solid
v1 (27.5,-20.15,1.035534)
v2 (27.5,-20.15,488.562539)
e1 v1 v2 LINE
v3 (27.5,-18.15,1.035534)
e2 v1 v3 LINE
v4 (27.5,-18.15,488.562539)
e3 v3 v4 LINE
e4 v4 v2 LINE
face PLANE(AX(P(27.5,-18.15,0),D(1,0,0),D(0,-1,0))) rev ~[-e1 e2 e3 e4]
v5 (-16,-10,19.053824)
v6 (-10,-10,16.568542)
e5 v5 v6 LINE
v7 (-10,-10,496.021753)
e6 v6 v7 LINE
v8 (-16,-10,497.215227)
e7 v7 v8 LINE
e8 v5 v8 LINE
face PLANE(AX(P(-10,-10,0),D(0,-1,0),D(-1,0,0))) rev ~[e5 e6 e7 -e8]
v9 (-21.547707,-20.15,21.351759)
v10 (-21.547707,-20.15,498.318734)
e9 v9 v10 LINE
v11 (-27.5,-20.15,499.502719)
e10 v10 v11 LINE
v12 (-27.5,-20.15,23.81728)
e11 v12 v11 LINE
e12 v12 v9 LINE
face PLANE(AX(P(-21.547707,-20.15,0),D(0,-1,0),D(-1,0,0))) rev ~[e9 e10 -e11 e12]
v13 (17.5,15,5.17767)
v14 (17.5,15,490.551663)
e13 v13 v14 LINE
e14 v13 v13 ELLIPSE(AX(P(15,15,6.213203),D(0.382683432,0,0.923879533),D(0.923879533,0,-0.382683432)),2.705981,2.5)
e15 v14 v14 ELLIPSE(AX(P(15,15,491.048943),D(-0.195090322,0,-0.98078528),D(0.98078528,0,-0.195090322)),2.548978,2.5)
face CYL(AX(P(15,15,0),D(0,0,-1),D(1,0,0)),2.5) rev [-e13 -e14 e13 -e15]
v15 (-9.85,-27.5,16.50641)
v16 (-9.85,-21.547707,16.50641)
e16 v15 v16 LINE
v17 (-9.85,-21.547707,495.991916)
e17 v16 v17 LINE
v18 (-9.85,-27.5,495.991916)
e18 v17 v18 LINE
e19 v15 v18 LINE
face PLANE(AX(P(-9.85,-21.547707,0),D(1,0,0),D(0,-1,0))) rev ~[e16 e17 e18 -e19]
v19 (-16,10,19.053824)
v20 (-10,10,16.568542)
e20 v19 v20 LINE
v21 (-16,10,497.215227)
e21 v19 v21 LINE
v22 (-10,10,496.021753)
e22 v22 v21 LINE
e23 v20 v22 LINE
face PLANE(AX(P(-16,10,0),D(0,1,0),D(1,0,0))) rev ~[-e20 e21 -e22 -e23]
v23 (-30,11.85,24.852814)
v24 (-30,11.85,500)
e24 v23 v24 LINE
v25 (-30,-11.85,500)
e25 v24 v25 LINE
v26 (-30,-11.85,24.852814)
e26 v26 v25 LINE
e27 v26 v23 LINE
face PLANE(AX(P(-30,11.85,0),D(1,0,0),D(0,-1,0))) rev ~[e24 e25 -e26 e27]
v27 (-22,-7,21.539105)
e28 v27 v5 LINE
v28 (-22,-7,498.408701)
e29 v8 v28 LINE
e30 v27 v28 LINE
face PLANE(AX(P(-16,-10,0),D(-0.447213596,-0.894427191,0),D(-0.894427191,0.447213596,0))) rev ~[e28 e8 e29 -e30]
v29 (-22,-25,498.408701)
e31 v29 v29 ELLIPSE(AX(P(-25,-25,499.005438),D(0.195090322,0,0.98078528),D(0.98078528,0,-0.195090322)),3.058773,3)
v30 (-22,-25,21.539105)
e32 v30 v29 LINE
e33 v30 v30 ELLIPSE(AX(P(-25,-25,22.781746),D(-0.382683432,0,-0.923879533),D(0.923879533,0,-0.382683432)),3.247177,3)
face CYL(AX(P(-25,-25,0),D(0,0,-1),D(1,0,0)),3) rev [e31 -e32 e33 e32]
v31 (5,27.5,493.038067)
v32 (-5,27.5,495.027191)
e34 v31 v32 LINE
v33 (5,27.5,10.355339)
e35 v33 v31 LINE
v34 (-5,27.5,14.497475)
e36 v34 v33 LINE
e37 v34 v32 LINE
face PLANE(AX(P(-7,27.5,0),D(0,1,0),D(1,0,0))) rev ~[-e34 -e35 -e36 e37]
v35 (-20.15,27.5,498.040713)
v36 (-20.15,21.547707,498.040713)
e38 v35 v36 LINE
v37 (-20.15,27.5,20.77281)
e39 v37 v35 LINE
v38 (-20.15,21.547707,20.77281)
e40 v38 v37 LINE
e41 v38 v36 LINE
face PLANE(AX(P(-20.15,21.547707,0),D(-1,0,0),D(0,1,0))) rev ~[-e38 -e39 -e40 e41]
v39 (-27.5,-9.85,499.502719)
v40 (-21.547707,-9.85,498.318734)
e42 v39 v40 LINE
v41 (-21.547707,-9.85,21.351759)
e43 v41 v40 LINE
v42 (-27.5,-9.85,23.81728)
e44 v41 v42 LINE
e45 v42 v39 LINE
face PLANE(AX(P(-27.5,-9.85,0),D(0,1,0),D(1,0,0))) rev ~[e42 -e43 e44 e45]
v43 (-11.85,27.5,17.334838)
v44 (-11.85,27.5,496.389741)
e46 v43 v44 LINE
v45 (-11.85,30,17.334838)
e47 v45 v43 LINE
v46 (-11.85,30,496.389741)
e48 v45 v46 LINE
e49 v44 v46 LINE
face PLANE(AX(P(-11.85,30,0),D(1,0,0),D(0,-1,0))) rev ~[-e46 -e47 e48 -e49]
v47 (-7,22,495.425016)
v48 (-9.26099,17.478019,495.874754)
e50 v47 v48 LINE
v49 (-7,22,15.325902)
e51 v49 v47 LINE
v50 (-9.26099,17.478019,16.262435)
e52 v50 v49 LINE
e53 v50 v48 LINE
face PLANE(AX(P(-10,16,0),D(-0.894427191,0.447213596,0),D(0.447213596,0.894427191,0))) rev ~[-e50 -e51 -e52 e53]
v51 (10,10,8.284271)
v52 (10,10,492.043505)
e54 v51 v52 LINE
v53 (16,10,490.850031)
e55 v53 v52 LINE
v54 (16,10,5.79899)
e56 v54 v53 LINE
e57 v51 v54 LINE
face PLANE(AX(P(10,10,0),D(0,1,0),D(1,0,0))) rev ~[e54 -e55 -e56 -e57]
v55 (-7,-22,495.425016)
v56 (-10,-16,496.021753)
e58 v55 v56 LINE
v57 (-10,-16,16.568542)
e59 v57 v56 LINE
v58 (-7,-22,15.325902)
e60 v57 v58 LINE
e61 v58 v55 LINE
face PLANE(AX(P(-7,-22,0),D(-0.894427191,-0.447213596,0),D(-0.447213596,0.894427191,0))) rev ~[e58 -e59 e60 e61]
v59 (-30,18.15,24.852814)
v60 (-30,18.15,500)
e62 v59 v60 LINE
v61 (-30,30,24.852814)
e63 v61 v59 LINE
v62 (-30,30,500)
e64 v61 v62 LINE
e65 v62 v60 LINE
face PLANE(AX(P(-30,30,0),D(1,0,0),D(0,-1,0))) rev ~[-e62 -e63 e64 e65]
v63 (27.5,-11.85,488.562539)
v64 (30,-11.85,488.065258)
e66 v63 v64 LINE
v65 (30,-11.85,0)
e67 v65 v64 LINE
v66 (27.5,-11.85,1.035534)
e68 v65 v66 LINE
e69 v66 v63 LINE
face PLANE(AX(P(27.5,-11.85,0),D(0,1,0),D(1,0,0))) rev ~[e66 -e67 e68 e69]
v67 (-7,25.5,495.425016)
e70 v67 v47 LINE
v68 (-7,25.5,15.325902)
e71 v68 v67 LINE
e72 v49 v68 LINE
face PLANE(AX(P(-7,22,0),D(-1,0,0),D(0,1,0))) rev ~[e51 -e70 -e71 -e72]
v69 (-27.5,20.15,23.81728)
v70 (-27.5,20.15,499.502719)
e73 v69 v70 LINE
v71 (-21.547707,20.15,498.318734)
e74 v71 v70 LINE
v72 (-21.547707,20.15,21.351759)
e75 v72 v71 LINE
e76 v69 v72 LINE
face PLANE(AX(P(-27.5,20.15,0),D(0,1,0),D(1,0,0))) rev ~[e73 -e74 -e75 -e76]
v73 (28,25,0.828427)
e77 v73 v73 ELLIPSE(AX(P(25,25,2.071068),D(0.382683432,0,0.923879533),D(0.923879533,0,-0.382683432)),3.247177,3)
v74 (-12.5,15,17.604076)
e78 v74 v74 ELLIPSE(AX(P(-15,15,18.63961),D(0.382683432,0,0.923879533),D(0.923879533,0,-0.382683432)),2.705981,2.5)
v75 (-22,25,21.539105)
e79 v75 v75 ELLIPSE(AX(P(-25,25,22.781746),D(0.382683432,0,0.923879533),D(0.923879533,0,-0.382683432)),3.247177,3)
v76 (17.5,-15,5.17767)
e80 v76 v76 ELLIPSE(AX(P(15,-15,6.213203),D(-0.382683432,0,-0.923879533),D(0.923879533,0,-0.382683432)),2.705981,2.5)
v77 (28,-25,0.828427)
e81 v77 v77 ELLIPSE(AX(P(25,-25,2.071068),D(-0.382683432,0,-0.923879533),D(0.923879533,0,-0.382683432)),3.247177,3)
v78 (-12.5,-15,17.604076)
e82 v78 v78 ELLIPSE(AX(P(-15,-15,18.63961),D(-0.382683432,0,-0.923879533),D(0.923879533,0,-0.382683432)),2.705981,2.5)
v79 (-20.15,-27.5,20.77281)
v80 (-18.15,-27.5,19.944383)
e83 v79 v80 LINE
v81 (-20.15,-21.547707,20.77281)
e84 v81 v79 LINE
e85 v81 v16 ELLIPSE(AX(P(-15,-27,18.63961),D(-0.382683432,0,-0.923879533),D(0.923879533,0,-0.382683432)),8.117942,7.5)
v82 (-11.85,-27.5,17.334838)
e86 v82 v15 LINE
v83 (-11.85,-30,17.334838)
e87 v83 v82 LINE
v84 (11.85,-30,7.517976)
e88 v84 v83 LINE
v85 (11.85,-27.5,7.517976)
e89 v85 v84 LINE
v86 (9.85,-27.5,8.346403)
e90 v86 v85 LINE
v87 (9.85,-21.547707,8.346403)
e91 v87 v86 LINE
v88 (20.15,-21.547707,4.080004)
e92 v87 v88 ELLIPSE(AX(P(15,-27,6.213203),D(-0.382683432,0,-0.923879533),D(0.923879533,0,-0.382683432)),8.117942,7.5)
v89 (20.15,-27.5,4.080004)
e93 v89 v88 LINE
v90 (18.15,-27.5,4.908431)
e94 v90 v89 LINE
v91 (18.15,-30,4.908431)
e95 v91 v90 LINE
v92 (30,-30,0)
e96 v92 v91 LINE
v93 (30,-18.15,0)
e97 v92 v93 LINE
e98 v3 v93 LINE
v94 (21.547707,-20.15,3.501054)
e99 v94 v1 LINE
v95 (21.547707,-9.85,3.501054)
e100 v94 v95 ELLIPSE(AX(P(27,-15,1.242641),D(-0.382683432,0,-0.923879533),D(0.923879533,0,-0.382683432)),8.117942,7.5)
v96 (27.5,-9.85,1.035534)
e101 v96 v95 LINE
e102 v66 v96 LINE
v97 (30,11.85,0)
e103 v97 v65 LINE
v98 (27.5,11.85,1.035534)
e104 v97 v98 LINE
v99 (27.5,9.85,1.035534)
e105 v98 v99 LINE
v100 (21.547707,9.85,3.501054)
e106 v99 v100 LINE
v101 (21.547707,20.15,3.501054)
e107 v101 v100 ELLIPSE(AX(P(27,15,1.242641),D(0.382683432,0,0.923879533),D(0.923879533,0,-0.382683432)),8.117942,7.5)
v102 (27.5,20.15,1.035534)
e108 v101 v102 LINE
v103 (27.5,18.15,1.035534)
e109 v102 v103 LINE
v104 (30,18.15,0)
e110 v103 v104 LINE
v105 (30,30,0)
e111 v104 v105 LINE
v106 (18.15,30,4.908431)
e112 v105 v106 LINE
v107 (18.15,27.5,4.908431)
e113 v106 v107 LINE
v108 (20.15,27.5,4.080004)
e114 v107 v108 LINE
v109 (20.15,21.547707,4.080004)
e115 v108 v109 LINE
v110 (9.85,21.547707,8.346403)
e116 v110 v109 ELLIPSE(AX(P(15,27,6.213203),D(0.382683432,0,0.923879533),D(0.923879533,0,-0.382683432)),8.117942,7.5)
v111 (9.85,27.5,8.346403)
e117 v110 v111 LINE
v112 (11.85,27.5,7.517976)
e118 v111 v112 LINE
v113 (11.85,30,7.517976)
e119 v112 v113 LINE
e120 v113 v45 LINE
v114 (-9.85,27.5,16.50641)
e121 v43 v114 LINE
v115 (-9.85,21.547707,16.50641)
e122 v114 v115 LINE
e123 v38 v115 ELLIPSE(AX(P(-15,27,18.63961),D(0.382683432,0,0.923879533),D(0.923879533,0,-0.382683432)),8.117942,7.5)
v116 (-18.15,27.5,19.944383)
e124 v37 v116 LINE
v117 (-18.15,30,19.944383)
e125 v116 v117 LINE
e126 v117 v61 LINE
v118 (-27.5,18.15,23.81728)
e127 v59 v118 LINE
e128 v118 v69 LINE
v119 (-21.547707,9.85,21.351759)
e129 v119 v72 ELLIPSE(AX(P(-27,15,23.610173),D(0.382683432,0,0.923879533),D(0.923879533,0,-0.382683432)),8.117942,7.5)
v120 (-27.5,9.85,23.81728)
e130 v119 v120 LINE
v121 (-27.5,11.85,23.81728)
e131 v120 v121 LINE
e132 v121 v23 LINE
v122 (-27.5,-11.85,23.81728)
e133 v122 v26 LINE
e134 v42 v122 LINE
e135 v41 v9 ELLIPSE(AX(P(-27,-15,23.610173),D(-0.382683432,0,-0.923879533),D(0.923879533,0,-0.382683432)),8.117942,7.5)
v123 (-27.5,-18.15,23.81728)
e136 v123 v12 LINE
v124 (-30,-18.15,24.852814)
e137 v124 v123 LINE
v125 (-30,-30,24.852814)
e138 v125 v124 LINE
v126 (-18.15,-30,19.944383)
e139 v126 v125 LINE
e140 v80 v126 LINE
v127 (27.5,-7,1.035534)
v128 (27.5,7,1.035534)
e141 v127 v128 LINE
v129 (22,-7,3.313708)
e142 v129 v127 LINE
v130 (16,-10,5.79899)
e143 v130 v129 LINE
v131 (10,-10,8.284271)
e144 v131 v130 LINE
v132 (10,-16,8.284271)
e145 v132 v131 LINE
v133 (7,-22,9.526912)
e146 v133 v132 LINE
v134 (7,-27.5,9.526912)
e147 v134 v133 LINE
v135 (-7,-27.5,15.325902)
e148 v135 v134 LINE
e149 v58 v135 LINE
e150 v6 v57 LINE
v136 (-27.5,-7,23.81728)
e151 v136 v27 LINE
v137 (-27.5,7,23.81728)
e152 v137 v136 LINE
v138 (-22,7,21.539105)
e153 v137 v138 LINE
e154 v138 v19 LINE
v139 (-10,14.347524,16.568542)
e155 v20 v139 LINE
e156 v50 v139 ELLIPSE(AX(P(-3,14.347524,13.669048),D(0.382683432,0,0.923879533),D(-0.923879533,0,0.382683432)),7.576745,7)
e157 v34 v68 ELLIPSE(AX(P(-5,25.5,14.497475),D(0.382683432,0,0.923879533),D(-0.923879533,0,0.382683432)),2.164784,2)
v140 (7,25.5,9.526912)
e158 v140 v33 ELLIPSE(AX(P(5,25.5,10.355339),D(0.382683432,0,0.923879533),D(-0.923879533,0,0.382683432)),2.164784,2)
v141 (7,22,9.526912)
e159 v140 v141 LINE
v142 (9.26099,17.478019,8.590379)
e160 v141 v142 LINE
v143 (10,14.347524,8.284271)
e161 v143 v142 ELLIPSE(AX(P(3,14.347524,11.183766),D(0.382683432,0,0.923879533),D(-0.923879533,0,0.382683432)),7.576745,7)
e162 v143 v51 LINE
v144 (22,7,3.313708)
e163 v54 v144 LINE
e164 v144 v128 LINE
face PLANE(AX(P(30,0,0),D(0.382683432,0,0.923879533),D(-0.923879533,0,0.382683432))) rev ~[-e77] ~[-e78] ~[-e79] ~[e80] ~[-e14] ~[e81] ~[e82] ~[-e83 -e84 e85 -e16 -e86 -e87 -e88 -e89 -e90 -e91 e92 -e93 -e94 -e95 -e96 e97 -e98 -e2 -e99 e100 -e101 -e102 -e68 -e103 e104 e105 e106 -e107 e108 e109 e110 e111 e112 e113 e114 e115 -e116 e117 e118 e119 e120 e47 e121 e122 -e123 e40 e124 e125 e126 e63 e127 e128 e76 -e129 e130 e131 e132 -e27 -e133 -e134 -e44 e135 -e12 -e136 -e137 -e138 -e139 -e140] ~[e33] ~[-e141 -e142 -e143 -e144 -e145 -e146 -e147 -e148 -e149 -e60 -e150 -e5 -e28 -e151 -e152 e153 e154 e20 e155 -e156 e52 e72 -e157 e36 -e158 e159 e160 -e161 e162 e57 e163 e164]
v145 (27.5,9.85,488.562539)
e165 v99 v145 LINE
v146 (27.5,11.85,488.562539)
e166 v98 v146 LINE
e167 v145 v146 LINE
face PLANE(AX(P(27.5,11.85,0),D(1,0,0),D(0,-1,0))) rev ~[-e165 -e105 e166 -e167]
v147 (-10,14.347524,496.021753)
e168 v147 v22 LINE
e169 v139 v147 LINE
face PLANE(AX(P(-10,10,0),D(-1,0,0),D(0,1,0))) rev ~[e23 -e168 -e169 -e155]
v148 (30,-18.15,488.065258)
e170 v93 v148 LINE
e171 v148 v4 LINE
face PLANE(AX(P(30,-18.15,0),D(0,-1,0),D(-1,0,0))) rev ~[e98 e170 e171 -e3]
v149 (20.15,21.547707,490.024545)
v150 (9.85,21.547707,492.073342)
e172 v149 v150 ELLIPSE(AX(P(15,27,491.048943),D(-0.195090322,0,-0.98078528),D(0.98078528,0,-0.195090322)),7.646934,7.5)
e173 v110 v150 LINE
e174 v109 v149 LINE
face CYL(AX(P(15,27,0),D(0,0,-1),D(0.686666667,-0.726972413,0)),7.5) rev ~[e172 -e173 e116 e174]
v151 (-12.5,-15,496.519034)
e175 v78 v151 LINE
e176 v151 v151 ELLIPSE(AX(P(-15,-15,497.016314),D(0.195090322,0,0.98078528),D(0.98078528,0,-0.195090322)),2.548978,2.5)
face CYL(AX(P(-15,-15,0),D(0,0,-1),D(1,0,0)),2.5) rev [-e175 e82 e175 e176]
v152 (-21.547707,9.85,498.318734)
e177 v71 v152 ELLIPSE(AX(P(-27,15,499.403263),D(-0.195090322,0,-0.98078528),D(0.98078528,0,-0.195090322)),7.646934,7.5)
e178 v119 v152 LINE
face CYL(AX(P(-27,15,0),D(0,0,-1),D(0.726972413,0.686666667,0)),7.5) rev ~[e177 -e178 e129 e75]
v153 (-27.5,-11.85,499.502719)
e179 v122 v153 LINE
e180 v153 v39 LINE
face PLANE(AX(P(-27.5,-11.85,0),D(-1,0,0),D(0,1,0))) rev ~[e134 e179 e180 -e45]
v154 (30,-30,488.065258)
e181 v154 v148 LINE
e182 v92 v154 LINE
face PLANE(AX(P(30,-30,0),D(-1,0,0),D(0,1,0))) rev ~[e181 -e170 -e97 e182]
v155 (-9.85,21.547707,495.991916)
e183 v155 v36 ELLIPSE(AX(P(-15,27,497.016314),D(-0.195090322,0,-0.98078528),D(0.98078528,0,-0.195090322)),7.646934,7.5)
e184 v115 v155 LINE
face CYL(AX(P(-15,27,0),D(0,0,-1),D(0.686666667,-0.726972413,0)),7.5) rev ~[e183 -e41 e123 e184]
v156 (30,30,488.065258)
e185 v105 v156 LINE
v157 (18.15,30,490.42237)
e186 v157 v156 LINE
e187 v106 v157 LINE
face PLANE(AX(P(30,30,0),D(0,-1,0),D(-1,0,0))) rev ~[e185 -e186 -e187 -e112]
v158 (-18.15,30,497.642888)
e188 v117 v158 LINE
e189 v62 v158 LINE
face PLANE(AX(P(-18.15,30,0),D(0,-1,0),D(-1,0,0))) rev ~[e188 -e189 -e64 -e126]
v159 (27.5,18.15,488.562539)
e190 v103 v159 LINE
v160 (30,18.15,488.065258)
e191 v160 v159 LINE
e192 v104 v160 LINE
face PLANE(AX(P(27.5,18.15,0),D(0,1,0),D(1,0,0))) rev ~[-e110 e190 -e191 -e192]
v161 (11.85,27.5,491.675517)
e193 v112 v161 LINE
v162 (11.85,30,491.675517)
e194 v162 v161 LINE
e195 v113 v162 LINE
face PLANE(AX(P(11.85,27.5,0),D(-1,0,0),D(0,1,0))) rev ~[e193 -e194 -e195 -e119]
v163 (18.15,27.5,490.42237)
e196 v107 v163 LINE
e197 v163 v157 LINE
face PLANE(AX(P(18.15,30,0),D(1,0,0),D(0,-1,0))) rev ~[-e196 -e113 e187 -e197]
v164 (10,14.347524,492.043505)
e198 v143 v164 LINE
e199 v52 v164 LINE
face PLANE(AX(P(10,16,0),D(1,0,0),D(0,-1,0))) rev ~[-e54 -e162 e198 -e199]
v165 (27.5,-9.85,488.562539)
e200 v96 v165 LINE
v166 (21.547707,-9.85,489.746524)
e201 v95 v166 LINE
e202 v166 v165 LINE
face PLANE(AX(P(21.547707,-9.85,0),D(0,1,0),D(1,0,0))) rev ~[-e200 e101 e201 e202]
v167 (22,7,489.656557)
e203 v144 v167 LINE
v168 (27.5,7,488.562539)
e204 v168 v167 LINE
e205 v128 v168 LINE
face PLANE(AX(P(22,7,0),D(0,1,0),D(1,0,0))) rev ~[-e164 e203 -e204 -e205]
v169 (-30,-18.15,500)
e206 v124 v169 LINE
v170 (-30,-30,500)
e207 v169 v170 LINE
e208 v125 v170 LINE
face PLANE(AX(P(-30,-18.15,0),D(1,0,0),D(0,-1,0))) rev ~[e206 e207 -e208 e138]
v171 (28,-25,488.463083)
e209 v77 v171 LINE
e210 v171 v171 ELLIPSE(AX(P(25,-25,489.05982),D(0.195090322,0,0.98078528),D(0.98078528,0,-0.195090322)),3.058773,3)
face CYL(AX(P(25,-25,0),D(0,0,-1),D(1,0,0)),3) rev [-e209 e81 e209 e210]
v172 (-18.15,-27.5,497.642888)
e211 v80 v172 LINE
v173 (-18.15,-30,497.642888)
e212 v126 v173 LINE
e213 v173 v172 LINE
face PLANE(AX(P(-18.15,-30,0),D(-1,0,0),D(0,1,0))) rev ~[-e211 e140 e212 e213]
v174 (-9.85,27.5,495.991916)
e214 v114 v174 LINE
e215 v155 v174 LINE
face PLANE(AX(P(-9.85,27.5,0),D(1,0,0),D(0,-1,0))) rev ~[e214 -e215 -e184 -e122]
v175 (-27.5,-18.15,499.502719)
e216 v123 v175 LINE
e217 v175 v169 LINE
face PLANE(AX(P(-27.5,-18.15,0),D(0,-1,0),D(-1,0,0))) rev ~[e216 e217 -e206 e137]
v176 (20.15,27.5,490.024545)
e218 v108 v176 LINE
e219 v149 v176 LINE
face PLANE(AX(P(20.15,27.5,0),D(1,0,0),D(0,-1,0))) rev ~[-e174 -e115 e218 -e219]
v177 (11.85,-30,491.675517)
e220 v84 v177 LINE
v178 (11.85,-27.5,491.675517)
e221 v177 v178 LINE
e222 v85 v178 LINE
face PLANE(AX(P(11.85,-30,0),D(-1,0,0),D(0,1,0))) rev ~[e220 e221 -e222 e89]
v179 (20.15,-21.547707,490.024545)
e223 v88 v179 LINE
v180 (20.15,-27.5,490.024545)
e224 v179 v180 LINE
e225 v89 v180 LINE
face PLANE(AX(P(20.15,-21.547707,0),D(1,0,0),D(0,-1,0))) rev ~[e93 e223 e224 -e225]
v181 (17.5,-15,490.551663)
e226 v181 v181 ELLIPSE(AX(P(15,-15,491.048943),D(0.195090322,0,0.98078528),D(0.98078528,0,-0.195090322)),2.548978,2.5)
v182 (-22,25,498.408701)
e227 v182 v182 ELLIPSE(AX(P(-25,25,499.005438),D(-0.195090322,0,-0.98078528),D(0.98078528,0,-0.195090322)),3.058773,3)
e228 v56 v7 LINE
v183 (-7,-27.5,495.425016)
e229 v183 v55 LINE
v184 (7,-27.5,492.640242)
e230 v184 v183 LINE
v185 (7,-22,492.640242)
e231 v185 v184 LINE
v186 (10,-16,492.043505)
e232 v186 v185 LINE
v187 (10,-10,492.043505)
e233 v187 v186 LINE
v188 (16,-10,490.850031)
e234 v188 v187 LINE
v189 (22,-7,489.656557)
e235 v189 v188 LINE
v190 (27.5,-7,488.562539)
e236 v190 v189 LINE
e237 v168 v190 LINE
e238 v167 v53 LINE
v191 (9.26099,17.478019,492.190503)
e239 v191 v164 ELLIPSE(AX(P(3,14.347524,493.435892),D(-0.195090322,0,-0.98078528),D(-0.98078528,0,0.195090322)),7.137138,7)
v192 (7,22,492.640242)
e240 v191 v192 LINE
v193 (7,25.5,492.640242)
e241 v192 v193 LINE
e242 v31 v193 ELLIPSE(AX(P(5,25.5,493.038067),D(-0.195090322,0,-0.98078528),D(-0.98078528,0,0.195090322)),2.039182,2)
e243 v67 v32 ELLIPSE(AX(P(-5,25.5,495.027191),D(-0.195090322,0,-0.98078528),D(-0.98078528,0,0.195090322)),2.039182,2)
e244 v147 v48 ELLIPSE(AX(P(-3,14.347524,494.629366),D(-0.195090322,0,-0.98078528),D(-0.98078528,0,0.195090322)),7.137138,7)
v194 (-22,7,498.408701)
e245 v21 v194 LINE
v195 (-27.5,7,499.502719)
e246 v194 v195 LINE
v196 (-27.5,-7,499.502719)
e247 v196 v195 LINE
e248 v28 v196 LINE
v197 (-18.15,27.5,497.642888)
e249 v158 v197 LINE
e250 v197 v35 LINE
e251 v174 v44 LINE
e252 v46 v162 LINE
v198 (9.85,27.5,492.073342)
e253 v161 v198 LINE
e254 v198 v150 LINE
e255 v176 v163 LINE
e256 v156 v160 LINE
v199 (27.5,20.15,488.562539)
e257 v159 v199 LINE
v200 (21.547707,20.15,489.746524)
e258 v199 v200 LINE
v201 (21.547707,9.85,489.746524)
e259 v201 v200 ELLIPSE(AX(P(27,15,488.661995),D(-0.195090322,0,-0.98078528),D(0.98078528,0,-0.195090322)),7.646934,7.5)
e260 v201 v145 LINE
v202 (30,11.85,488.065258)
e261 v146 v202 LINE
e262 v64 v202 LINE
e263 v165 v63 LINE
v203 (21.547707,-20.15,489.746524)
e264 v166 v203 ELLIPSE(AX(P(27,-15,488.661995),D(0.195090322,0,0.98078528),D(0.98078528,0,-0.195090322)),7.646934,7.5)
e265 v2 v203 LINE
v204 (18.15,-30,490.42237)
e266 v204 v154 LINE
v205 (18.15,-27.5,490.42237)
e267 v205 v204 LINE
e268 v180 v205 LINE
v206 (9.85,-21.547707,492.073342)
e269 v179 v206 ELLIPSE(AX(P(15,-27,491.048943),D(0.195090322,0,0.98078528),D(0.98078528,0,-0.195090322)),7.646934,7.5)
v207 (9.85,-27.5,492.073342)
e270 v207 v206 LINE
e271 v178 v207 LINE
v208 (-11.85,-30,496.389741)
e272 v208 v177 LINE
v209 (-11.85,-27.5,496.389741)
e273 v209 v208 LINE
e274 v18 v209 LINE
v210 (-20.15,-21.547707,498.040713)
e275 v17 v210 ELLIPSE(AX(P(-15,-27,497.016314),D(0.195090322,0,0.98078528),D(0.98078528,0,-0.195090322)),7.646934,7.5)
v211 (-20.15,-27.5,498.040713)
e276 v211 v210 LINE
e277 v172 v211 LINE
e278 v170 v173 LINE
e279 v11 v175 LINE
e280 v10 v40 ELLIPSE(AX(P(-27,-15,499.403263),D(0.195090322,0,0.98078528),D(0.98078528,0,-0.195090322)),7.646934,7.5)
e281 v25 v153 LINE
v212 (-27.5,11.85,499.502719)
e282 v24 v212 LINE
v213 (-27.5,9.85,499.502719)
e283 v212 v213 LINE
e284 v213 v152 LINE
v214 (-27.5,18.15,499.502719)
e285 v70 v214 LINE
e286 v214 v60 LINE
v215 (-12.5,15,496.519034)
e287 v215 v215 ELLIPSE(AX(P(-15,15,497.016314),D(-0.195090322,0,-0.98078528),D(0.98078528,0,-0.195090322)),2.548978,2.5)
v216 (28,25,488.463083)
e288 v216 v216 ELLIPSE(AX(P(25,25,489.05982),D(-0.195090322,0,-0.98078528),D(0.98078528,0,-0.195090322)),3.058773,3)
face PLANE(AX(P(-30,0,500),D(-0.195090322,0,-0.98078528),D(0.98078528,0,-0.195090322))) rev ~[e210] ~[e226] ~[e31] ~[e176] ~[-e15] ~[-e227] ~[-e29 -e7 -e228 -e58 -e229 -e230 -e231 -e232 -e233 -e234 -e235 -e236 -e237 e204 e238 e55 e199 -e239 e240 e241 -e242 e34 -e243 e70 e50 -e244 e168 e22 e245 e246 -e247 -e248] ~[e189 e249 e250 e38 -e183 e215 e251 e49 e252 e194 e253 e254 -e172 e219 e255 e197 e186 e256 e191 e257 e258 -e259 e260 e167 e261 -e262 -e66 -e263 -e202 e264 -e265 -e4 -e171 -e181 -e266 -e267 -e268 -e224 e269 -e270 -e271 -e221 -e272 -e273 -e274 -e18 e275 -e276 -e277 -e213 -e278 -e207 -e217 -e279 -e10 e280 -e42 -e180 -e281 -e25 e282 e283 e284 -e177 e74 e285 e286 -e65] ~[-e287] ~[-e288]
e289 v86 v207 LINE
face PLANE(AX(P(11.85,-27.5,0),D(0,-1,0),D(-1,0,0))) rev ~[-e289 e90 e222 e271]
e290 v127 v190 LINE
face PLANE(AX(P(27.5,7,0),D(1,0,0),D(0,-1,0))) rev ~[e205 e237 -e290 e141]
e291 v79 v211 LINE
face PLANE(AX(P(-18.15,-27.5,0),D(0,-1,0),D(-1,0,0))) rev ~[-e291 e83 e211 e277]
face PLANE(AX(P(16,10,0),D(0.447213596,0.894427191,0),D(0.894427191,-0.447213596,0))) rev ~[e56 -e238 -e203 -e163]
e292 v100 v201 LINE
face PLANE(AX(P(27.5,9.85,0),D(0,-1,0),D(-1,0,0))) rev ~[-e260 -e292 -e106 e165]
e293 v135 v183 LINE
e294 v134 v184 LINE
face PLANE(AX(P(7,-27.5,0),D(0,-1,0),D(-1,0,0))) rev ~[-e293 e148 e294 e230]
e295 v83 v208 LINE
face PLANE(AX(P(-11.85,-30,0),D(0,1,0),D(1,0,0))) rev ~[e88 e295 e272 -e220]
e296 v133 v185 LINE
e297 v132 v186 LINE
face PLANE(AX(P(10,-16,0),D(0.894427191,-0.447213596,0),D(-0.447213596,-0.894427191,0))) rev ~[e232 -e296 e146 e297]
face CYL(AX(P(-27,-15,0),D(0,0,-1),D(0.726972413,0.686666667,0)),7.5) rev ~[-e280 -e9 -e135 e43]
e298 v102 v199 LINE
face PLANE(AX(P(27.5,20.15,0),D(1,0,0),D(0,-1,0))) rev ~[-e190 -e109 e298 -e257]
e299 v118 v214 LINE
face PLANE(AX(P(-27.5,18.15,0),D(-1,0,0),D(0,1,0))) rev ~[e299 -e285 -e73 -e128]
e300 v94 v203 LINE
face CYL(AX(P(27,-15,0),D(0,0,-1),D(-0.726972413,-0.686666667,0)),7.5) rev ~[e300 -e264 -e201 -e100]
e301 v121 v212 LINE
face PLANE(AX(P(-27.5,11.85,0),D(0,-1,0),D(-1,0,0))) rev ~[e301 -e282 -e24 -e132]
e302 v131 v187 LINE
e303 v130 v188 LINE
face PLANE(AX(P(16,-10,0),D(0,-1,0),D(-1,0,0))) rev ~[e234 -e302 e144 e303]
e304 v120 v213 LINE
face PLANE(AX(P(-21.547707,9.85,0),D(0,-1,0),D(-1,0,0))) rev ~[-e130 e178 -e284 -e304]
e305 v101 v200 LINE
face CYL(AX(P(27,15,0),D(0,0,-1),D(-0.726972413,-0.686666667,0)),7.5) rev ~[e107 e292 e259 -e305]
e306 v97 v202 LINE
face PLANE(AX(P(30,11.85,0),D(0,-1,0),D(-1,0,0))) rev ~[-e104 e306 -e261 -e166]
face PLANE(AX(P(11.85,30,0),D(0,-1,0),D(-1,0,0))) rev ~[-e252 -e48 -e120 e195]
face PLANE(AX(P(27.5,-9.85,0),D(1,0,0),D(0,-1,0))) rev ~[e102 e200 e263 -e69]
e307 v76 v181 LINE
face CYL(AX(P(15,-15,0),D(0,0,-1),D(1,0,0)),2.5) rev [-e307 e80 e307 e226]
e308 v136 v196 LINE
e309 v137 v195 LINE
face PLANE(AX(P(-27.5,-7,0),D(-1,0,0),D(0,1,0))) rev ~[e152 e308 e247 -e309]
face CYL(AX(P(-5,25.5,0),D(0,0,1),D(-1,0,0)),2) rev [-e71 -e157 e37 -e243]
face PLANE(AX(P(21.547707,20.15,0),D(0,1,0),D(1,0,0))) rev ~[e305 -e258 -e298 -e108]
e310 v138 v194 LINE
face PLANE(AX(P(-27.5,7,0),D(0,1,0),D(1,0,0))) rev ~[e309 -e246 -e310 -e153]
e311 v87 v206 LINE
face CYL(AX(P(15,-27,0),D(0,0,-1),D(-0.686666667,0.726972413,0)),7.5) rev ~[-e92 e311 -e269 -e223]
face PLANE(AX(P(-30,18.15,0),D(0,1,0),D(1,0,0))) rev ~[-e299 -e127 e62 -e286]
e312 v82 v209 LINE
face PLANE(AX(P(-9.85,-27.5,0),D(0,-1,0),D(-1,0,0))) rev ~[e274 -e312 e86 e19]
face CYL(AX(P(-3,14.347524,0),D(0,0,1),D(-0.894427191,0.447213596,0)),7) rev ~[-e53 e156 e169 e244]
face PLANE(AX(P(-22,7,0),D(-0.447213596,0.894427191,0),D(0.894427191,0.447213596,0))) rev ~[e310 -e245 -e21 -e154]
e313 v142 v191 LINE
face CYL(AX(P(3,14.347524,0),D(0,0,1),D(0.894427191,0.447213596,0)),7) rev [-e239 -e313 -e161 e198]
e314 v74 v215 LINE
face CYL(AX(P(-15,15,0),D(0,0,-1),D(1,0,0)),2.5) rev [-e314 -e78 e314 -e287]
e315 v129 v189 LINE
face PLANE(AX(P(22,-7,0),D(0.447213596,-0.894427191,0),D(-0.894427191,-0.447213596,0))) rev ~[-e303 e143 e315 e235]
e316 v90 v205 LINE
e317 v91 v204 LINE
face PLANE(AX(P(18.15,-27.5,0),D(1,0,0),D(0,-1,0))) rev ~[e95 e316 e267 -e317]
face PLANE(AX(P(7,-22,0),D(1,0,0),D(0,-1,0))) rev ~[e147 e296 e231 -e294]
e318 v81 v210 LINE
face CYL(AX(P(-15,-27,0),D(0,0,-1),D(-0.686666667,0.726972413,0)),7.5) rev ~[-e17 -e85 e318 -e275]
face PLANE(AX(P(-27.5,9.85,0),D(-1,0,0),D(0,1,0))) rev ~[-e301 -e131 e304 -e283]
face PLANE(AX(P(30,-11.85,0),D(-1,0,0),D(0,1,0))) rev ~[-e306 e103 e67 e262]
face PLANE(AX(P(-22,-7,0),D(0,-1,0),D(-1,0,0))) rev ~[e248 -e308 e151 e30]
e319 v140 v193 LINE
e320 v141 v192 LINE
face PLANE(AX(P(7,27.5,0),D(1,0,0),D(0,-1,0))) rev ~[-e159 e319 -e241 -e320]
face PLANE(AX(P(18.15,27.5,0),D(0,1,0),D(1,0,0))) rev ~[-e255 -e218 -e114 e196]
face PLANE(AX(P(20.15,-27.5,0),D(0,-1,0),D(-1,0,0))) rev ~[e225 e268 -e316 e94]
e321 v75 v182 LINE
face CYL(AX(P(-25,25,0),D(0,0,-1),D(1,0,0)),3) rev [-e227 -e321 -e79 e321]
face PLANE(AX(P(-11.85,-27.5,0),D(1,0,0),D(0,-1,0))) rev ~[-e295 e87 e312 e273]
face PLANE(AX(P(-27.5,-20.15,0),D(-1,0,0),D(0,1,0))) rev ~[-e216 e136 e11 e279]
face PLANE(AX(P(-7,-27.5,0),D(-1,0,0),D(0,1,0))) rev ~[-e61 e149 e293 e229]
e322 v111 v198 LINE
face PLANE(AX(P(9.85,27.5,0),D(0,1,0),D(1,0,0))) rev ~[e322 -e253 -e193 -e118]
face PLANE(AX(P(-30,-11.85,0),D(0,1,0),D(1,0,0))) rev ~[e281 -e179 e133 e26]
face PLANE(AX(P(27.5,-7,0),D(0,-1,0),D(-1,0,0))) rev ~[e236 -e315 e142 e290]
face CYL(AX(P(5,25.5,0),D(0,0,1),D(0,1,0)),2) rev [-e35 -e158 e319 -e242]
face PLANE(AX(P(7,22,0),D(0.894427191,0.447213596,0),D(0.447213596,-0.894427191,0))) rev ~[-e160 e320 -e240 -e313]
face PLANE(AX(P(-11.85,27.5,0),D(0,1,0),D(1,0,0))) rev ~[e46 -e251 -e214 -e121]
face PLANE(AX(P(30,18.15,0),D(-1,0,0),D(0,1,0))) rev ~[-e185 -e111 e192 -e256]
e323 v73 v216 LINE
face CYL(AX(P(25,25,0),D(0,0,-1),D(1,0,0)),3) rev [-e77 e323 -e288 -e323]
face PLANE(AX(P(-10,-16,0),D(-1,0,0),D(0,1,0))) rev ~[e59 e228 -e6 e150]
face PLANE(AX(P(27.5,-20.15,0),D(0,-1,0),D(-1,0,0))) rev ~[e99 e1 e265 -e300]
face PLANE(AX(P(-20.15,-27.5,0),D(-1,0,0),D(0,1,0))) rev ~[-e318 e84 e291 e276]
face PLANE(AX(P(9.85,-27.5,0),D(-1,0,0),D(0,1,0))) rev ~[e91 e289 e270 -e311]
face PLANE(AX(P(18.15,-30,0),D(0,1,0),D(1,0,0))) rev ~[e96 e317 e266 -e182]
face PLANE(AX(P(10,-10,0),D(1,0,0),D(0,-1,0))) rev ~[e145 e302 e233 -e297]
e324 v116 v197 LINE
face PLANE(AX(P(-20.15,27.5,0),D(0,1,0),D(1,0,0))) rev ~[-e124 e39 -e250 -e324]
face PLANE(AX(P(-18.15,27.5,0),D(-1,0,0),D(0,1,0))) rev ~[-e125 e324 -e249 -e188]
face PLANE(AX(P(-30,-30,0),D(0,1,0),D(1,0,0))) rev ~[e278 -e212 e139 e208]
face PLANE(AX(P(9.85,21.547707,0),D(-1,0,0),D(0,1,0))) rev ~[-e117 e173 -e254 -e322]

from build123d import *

# Parameters (mm, degrees)
F0_R          = 3
F0_R_2        = 2.5
F1_DEPTH      = 500
F2_R          = 2
F3_R          = 7
F6_DEPTH      = 30
F6_DEPTH_BACK = 30


# Not quite as in the source:
# - a feature names something its author has since deleted; it is built from what else it names


with BuildPart() as f1:
    # F0 (on Top) → F1 (new body)
    with BuildSketch(Plane.XY):
        with BuildLine():
            Line((18.15, -30), (30, -30))
            Line((30, -30), (30, -18.15))
            Line((30, -18.15), (27.5, -18.15))
            Line((27.5, -18.15), (27.5, -20.15))
            Line((27.5, -20.15), (21.5477069044, -20.15))
            ThreePointArc((21.5477069044, -20.15), (19.5, -15), (21.5477069044, -9.85))
            Line((21.5477069044, -9.85), (27.5, -9.85))
            Line((27.5, -9.85), (27.5, -11.85))
            Line((27.5, -11.85), (30, -11.85))
            Line((30, -11.85), (30, 11.85))
            Line((30, 11.85), (27.5, 11.85))
            Line((27.5, 11.85), (27.5, 9.85))
            Line((27.5, 9.85), (21.5477069044, 9.85))
            ThreePointArc((21.5477069044, 9.85), (19.5, 15), (21.5477069044, 20.15))
            Line((21.5477069044, 20.15), (27.5, 20.15))
            Line((27.5, 20.15), (27.5, 18.15))
            Line((27.5, 18.15), (30, 18.15))
            Line((30, 18.15), (30, 30))
            Line((30, 30), (18.15, 30))
            Line((18.15, 30), (18.15, 27.5))
            Line((18.15, 27.5), (20.15, 27.5))
            Line((20.15, 27.5), (20.15, 21.5477069044))
            ThreePointArc((20.15, 21.5477069044), (15, 19.5), (9.85, 21.5477069044))
            Line((9.85, 21.5477069044), (9.85, 27.5))
            Line((9.85, 27.5), (11.85, 27.5))
            Line((11.85, 27.5), (11.85, 30))
            Line((11.85, 30), (-11.85, 30))
            Line((-11.85, 30), (-11.85, 27.5))
            Line((-11.85, 27.5), (-9.85, 27.5))
            Line((-9.85, 27.5), (-9.85, 21.5477069044))
            ThreePointArc((-9.85, 21.5477069044), (-15, 19.5), (-20.15, 21.5477069044))
            Line((-20.15, 21.5477069044), (-20.15, 27.5))
            Line((-20.15, 27.5), (-18.15, 27.5))
            Line((-18.15, 27.5), (-18.15, 30))
            Line((-18.15, 30), (-30, 30))
            Line((-30, 30), (-30, 18.15))
            Line((-30, 18.15), (-27.5, 18.15))
            Line((-27.5, 18.15), (-27.5, 20.15))
            Line((-27.5, 20.15), (-21.5477069044, 20.15))
            ThreePointArc((-21.5477069044, 20.15), (-19.5, 15), (-21.5477069044, 9.85))
            Line((-21.5477069044, 9.85), (-27.5, 9.85))
            Line((-27.5, 9.85), (-27.5, 11.85))
            Line((-27.5, 11.85), (-30, 11.85))
            Line((-30, 11.85), (-30, -11.85))
            Line((-30, -11.85), (-27.5, -11.85))
            Line((-27.5, -11.85), (-27.5, -9.85))
            Line((-27.5, -9.85), (-21.5477069044, -9.85))
            ThreePointArc((-21.5477069044, -9.85), (-19.5, -15), (-21.5477069044, -20.15))
            Line((-21.5477069044, -20.15), (-27.5, -20.15))
            Line((-27.5, -20.15), (-27.5, -18.15))
            Line((-27.5, -18.15), (-30, -18.15))
            Line((-30, -18.15), (-30, -30))
            Line((-30, -30), (-18.15, -30))
            Line((-18.15, -30), (-18.15, -27.5))
            Line((-18.15, -27.5), (-20.15, -27.5))
            Line((-20.15, -27.5), (-20.15, -21.5477069044))
            ThreePointArc((-20.15, -21.5477069044), (-15, -19.5), (-9.85, -21.5477069044))
            Line((-9.85, -21.5477069044), (-9.85, -27.5))
            Line((-9.85, -27.5), (-11.85, -27.5))
            Line((-11.85, -27.5), (-11.85, -30))
            Line((-11.85, -30), (11.85, -30))
            Line((11.85, -30), (11.85, -27.5))
            Line((11.85, -27.5), (9.85, -27.5))
            Line((9.85, -27.5), (9.85, -21.5477069044))
            ThreePointArc((9.85, -21.5477069044), (15, -19.5), (20.15, -21.5477069044))
            Line((20.15, -21.5477069044), (20.15, -27.5))
            Line((20.15, -27.5), (18.15, -27.5))
            Line((18.15, -27.5), (18.15, -30))
        make_face()
        with Locations((-25, -25)):
            Circle(F0_R, mode=Mode.SUBTRACT)
        with Locations((-15, -15)):
            Circle(F0_R_2, mode=Mode.SUBTRACT)
        with Locations((25, -25)):
            Circle(F0_R, mode=Mode.SUBTRACT)
        with Locations((15, -15)):
            Circle(F0_R_2, mode=Mode.SUBTRACT)
        with Locations((-25, 25)):
            Circle(F0_R, mode=Mode.SUBTRACT)
        with Locations((-15, 15)):
            Circle(F0_R_2, mode=Mode.SUBTRACT)
        Polygon((-7, 22), (-7, 27.5), (0, 27.5), (7, 27.5), (7, 22), (10, 16), (10, 10), (16, 10), (22, 7), (27.5, 7), (27.5, 0), (27.5, -7), (22, -7), (16, -10), (10, -10), (10, -16), (7, -22), (7, -27.5), (0, -27.5), (-7, -27.5), (-7, -22), (-10, -16), (-10, -10), (-16, -10), (-22, -7), (-27.5, -7), (-27.5, 0), (-27.5, 7), (-22, 7), (-16, 10), (-10, 10), (-10, 16), align=None, mode=Mode.SUBTRACT)
        with Locations((15, 15)):
            Circle(F0_R_2, mode=Mode.SUBTRACT)
        with Locations((25, 25)):
            Circle(F0_R, mode=Mode.SUBTRACT)
    extrude(amount=F1_DEPTH)

    # F2
    f2_edges = [f1.edges().sort_by_distance(p)[0] for p in [
        (-7, 27.5, 250),
        (7, 27.5, 250),
    ]]
    fillet(f2_edges, radius=F2_R)

    # F3
    f3_edges = [f1.edges().sort_by_distance(p)[0] for p in [
        (-10, 16, 250),
        (10, 16, 250),
    ]]
    fillet(f3_edges, radius=F3_R)

    # F5 (on Front) → F6 (cut, two sides)
    with BuildSketch(Plane.XZ) as f6_sk:
        Polygon((190.5190290352, 666.216575566), (10.1971706169, 702.0848233142), (-30, 500), (150.3218584183, 464.1317522517), align=None)
        Polygon((-47.8999755124, -188.0671773906), (30, 0), (-147.6190188423, 73.5722065399), (-225.5189943547, -114.4949708507), align=None)
    extrude(amount=F6_DEPTH, mode=Mode.SUBTRACT)
    extrude(f6_sk.sketch, amount=-F6_DEPTH_BACK, mode=Mode.SUBTRACT)


solid = f1.part
